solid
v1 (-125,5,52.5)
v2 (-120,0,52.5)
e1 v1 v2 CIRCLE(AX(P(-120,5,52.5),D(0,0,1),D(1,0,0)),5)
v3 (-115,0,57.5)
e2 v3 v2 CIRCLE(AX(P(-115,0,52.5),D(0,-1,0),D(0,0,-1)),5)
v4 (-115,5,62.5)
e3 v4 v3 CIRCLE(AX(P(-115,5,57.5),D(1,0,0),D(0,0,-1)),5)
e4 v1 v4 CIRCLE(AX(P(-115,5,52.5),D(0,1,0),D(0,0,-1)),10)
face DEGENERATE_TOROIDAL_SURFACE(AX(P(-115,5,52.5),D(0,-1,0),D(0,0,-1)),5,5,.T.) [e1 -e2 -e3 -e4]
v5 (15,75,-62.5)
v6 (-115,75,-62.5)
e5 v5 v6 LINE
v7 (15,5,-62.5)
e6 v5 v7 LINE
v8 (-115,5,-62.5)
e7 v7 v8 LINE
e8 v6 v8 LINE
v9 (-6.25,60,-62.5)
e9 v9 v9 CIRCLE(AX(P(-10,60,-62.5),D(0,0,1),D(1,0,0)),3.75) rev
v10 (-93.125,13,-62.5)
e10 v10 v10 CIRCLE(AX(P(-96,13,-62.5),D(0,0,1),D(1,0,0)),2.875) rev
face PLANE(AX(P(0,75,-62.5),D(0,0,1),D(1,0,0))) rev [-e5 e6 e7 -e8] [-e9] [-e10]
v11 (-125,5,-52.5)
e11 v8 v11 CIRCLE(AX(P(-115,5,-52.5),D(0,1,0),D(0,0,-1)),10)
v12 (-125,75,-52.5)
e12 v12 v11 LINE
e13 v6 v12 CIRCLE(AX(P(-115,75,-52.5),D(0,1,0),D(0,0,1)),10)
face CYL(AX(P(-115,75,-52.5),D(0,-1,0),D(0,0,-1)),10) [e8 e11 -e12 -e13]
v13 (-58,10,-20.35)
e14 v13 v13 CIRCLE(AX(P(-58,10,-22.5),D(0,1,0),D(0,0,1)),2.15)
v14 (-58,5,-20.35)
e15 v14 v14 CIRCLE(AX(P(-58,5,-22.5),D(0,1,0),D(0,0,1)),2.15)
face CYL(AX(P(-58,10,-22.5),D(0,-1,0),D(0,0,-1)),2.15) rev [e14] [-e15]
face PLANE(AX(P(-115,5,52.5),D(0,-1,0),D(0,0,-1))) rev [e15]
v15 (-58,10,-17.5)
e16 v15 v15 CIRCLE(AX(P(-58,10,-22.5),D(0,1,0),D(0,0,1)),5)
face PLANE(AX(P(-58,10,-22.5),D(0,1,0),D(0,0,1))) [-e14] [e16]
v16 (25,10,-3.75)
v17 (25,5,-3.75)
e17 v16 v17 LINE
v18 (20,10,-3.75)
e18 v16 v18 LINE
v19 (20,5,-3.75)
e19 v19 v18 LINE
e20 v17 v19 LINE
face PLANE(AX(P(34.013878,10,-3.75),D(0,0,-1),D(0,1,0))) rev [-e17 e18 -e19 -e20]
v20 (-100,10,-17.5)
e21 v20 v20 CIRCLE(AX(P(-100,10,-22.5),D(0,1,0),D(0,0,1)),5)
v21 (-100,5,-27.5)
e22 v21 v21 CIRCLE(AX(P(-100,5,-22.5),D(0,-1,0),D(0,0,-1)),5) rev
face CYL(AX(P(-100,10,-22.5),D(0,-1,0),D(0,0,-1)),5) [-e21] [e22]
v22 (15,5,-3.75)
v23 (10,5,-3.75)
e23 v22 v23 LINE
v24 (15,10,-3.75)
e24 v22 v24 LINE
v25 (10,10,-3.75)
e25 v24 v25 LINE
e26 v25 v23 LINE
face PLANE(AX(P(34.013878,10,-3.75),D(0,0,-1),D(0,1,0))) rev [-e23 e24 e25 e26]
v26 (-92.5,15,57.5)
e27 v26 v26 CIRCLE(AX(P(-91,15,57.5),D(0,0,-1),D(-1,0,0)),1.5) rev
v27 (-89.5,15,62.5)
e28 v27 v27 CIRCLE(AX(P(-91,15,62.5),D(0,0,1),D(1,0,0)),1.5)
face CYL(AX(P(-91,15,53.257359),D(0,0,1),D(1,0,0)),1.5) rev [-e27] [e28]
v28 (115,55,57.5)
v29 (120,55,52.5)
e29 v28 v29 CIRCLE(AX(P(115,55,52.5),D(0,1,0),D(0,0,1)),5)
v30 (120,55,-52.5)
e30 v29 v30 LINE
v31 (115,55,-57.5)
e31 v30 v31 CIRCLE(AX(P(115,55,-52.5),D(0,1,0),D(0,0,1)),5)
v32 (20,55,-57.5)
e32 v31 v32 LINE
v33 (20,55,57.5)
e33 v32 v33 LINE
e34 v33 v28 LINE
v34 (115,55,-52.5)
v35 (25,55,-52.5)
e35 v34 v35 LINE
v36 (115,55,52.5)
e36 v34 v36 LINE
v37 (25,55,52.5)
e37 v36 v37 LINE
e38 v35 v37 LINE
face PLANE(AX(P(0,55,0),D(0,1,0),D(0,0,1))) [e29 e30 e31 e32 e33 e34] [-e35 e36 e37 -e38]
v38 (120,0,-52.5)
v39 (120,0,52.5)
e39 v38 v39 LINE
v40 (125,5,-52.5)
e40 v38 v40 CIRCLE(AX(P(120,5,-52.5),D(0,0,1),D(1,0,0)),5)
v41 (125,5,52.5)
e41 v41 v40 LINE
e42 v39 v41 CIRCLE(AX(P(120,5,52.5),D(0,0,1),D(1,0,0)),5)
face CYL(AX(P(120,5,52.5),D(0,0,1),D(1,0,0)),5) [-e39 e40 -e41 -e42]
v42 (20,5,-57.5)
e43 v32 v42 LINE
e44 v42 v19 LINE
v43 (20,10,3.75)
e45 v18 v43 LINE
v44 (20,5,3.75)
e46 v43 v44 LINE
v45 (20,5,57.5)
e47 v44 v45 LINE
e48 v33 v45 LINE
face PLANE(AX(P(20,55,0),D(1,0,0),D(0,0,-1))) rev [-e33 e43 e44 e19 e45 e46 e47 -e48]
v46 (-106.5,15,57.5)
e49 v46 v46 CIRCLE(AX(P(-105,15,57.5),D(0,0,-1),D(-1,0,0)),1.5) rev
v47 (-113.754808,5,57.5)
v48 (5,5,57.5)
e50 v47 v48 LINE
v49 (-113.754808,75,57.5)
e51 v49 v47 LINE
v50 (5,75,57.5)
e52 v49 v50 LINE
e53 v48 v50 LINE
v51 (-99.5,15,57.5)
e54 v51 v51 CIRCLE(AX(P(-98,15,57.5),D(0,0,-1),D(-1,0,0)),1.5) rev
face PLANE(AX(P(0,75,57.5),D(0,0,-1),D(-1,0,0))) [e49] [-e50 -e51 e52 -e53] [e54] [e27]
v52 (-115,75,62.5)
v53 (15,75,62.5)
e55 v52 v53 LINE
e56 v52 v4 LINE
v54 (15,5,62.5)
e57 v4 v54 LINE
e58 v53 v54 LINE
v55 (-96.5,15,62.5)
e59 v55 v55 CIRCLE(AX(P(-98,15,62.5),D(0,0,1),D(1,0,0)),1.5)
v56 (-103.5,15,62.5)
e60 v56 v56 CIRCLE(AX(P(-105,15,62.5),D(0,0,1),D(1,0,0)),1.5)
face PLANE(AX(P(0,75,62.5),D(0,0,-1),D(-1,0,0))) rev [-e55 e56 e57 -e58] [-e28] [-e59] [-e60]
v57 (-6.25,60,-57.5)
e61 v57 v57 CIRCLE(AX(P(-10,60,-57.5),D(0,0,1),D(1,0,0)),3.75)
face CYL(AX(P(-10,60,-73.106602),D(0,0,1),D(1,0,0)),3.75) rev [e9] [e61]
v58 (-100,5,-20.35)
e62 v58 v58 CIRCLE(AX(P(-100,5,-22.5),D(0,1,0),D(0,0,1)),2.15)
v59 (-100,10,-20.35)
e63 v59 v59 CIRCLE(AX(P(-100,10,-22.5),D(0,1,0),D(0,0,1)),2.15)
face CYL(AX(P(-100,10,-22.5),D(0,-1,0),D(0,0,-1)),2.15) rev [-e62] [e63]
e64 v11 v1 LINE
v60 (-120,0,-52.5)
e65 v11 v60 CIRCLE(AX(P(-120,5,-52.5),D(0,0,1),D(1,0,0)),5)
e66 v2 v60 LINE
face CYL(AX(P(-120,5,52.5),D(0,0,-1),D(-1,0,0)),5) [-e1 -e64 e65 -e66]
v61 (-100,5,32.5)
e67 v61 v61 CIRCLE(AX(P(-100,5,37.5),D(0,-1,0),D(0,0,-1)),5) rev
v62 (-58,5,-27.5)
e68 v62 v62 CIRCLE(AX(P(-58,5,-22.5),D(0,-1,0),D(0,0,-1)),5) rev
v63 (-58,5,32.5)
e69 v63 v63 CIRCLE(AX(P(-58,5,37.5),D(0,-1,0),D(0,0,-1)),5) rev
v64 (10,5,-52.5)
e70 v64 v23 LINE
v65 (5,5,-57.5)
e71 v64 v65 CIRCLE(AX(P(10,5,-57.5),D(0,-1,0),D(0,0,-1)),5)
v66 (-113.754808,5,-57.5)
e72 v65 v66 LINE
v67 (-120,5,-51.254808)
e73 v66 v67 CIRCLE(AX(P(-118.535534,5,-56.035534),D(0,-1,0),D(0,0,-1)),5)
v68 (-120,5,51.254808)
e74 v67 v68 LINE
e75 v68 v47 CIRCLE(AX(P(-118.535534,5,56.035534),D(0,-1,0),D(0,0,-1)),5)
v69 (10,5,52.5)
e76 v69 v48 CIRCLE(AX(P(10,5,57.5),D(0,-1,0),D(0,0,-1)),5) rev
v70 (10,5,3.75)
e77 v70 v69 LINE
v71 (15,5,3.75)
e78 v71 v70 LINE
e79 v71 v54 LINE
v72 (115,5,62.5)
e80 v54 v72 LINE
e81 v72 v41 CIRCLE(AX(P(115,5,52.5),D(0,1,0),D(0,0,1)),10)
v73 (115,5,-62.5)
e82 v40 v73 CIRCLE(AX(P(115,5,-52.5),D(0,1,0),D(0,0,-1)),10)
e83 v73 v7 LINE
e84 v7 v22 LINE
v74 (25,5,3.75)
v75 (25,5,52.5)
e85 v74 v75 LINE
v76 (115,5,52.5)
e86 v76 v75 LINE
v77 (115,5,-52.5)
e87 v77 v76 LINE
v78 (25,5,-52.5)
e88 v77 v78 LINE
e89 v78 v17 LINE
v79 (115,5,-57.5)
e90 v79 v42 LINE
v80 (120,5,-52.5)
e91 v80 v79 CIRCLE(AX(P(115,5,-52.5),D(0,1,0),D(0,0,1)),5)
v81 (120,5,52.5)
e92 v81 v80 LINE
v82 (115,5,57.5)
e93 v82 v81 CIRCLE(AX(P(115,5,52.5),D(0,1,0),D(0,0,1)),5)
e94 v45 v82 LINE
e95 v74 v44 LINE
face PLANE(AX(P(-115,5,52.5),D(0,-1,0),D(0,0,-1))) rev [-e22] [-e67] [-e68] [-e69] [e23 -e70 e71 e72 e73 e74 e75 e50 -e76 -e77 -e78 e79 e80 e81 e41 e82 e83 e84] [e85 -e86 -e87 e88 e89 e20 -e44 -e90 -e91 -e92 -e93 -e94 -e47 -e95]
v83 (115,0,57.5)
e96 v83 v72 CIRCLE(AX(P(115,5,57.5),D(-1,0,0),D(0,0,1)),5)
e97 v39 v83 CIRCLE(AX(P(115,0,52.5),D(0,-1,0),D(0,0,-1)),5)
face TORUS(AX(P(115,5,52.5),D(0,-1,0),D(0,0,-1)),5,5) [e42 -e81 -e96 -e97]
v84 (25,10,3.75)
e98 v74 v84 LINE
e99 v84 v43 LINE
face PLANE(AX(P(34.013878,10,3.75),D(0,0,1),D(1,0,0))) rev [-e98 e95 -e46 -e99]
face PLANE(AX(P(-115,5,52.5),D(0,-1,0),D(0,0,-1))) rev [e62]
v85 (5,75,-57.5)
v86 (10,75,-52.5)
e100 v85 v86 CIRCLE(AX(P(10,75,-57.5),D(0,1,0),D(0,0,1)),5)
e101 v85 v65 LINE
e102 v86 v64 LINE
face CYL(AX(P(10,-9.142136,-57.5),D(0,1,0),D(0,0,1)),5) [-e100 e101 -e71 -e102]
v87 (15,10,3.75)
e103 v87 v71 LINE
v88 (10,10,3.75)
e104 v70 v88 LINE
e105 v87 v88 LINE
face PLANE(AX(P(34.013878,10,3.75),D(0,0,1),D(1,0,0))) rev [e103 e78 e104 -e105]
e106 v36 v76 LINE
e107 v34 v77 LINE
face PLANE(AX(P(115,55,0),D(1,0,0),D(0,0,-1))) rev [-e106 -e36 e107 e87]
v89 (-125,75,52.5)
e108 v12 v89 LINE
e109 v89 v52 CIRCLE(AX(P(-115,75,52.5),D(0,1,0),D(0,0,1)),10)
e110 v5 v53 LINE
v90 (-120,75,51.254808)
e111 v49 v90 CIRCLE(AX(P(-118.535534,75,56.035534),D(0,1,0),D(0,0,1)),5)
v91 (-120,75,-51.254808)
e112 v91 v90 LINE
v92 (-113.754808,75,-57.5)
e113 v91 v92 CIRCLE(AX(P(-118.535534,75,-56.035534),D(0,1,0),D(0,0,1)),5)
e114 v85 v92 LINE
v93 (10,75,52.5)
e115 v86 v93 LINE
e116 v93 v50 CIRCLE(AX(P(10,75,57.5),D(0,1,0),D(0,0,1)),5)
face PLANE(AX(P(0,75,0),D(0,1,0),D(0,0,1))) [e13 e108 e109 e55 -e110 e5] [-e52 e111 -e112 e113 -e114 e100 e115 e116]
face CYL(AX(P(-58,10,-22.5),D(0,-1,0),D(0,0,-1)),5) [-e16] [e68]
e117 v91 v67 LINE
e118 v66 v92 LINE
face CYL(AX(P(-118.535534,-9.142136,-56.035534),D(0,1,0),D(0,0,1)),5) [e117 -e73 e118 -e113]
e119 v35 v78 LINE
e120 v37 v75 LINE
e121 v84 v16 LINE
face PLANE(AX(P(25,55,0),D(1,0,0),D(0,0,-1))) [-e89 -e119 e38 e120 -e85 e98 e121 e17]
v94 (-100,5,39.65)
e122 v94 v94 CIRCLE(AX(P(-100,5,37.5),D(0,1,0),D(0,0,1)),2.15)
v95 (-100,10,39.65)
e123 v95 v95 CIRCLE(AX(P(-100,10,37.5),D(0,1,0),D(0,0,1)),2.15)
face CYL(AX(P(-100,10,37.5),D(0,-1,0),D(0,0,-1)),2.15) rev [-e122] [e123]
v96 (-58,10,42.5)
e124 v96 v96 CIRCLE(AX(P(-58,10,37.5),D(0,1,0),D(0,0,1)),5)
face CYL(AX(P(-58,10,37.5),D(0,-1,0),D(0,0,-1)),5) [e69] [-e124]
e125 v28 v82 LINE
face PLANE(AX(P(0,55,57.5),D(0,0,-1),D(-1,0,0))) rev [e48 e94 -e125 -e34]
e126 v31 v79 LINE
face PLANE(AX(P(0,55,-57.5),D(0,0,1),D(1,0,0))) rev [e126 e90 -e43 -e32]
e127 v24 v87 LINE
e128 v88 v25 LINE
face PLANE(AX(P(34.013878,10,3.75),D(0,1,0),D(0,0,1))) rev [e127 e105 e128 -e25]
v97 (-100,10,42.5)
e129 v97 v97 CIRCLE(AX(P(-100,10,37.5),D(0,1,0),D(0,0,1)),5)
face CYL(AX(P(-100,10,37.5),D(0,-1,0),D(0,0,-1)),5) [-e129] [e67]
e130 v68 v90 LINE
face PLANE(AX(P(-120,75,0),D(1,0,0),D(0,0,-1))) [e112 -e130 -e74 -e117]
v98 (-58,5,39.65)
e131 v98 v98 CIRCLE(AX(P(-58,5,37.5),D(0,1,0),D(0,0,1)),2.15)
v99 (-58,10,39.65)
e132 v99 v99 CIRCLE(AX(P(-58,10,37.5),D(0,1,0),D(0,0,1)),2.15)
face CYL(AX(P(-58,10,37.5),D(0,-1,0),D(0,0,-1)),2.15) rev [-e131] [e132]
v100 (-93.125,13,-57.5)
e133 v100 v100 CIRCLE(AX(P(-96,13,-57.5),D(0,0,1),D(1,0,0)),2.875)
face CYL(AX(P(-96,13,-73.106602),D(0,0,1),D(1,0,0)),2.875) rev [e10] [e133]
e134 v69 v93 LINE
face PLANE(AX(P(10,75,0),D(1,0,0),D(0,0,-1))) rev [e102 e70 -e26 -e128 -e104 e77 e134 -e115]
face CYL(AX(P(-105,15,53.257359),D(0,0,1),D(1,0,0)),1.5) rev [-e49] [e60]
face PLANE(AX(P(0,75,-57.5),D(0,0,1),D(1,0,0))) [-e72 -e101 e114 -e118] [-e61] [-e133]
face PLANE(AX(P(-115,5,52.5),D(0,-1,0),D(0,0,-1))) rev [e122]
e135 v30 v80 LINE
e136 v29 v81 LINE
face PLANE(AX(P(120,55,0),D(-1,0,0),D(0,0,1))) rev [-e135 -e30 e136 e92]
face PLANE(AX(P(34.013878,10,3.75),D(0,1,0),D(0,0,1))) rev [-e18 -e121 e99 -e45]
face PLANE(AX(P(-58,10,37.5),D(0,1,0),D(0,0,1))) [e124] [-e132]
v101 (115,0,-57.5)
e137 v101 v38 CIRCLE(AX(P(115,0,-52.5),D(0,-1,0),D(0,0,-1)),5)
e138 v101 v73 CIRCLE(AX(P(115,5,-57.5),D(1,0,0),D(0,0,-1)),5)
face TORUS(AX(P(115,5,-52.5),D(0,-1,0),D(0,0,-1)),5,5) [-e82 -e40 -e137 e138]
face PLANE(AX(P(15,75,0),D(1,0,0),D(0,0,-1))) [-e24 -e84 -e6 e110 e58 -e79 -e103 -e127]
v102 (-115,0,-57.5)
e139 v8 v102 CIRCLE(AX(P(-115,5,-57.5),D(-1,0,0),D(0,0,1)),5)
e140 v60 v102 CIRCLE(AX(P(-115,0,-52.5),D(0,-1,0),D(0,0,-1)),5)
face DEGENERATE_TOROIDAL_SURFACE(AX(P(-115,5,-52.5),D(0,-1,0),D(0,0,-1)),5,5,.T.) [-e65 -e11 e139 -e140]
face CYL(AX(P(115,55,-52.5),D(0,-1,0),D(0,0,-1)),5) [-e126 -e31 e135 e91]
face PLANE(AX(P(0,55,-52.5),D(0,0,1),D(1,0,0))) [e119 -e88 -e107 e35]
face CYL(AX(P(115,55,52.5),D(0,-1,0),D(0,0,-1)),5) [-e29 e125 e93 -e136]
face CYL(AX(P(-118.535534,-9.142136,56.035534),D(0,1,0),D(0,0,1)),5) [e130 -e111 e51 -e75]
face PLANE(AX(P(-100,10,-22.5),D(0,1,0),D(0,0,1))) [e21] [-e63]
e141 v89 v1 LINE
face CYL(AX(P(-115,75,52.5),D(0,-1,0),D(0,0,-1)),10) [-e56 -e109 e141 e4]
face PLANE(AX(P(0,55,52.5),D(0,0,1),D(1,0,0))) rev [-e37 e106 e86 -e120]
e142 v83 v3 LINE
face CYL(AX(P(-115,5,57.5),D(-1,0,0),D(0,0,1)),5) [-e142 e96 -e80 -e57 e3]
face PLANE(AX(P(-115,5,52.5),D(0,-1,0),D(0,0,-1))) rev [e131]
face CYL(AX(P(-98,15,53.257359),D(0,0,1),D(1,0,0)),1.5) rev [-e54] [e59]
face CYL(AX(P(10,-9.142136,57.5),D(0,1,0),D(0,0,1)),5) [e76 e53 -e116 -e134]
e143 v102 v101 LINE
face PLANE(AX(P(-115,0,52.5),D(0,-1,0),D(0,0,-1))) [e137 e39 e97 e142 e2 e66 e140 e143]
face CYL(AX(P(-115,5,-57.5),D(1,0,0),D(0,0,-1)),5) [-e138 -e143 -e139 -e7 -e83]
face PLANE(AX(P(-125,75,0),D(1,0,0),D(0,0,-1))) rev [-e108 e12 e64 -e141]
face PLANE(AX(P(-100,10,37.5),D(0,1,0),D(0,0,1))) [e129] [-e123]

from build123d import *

# Parameters (mm, degrees)
BOSS_EXTRUDE1_DEPTH = 5
FILLET1_R           = 5
SKETCH2_W           = 5
SKETCH2_H           = 115
SKETCH2_H_2         = 5
BOSS_EXTRUDE2_DEPTH = 70
SKETCH2_3_W         = 5
SKETCH2_3_H         = 105
SKETCH2_3_H_2       = 5
BOSS_EXTRUDE3_DEPTH = 50
SKETCH3_R           = 5
BOSS_EXTRUDE4_DEPTH = 70
CUT_EXTRUDE1_REACH  = 168.602
SKETCH4_W           = 7.5
SKETCH4_H           = 5
SKETCH5_R           = 2.875
SKETCH5_R_2         = 3.75
CUT_EXTRUDE2_DEPTH  = 5
SKETCH6_R           = 1.5
CUT_EXTRUDE3_DEPTH  = 5
SKETCH8_R           = 5
SKETCH8_R_2         = 2.15
BOSS_EXTRUDE5_DEPTH = 5


with BuildPart() as part:
    # Sketch1 → Boss-Extrude1 (new body)
    with BuildSketch(Plane(origin=(0, 0, 0), x_dir=(1, 0, 0), z_dir=(0, 1, 0))):
        with BuildLine():
            Line((-115, -62.5), (115, -62.5))
            ThreePointArc((115, -62.5), (122.071067812, -59.571067812), (125, -52.5))
            Line((125, -52.5), (125, 52.5))
            ThreePointArc((125, 52.5), (122.071067812, 59.571067812), (115, 62.5))
            Line((115, 62.5), (-115, 62.5))
            ThreePointArc((-115, 62.5), (-122.071067812, 59.571067812), (-125, 52.5))
            Line((-125, 52.5), (-125, -52.5))
            ThreePointArc((-125, -52.5), (-122.071067812, -59.571067812), (-115, -62.5))
        make_face()
    extrude(amount=BOSS_EXTRUDE1_DEPTH)

    # Fillet1
    fillet1_edges = [part.edges().sort_by_distance(p)[0] for p in [
        (0, 0, 62.5),
        (122.071067812, 0, 59.571067812),
        (125, 0, 0),
        (122.071067812, 0, -59.571067812),
        (0, 0, -62.5),
        (-122.071067812, 0, -59.571067812),
        (-125, 0, 0),
        (-122.071067812, 0, 59.571067812),
    ]]
    fillet(fillet1_edges, radius=FILLET1_R - 0.0001)  # a hair under: the kernel refuses the full size

    # Sketch2 → Boss-Extrude2 (add)
    with BuildSketch(Plane(origin=(0, 5, 0), x_dir=(1, 0, 0), z_dir=(0, 1, 0))):
        with Locations((12.5, 0)):
            Rectangle(SKETCH2_W, SKETCH2_H)
        with Locations((12.5, -60)):
            Rectangle(SKETCH2_W, SKETCH2_H_2)
        with BuildLine():
            Line((10, -62.5), (10, -57.5))
            Line((10, -57.5), (-115, -57.5))
            ThreePointArc((-115, -57.5), (-118.535533906, -56.035533906), (-120, -52.5))
            Line((-120, -52.5), (-120, 52.5))
            ThreePointArc((-120, 52.5), (-118.535533906, 56.035533906), (-115, 57.5))
            Line((-115, 57.5), (10, 57.5))
            Line((10, 57.5), (10, 62.5))
            Line((10, 62.5), (-115, 62.5))
            ThreePointArc((-115, 62.5), (-122.071067812, 59.571067812), (-125, 52.5))
            Line((-125, 52.5), (-125, -52.5))
            ThreePointArc((-125, -52.5), (-122.071067812, -59.571067812), (-115, -62.5))
            Line((-115, -62.5), (10, -62.5))
        make_face()
        with Locations((12.5, 60)):
            Rectangle(SKETCH2_W, SKETCH2_H_2)
    extrude(amount=BOSS_EXTRUDE2_DEPTH)

    # Sketch2<3> → Boss-Extrude3 (add)
    with BuildSketch(Plane(origin=(0, 5, 0), x_dir=(1, 0, 0), z_dir=(0, 1, 0))):
        with Locations((22.5, 0)):
            Rectangle(SKETCH2_3_W, SKETCH2_3_H)
        with BuildLine():
            Line((25, -52.5), (25, -57.5))
            Line((25, -57.5), (115, -57.5))
            ThreePointArc((115, -57.5), (118.535533906, -56.035533906), (120, -52.5))
            Line((120, -52.5), (120, 52.5))
            ThreePointArc((120, 52.5), (118.535533906, 56.035533906), (115, 57.5))
            Line((115, 57.5), (25, 57.5))
            Line((25, 57.5), (25, 52.5))
            Line((25, 52.5), (115, 52.5))
            Line((115, 52.5), (115, -52.5))
            Line((115, -52.5), (25, -52.5))
        make_face()
        with Locations((22.5, 55)):
            Rectangle(SKETCH2_3_W, SKETCH2_3_H_2)
        with Locations((22.5, -55)):
            Rectangle(SKETCH2_3_W, SKETCH2_3_H_2)
    extrude(amount=BOSS_EXTRUDE3_DEPTH)

    # Sketch3 → Boss-Extrude4 (add)
    with BuildSketch(Plane(origin=(0, 75, 0), x_dir=(1, 0, 0), z_dir=(0, 1, 0))):
        with Locations((-118.535533906, 56.035533906)):
            Circle(SKETCH3_R)
        with Locations((10, 57.5)):
            Circle(SKETCH3_R)
        with Locations((10, -57.5)):
            Circle(SKETCH3_R)
        with Locations((-118.535533906, -56.035533906)):
            Circle(SKETCH3_R)
    extrude(amount=-BOSS_EXTRUDE4_DEPTH)

    # Cut-Extrude1: up to this face of the body (flat: up to its plane)
    cut_extrude1_end = Plane(part.part.faces().sort_by_distance((25, 30, 0))[0])
    # Sketch4 → Cut-Extrude1 (cut, up to the picked face)
    with BuildSketch(Plane.ZY.offset(-10), mode=Mode.PRIVATE) as cut_extrude1_sk1:
        with Locations((0, 7.5)):
            Rectangle(SKETCH4_W, SKETCH4_H)
    cut_extrude1_tool1 = split(extrude(cut_extrude1_sk1.sketch, amount=-CUT_EXTRUDE1_REACH, mode=Mode.PRIVATE), bisect_by=cut_extrude1_end, keep=Keep.BOTH, mode=Mode.PRIVATE)
    add(cut_extrude1_tool1.solids().sort_by(Axis((10, 7.5, 0), (1, 0, 0)))[0], mode=Mode.SUBTRACT)

    # Sketch5 → Cut-Extrude2 (cut)
    with BuildSketch(Plane.XY.offset(-57.5)):
        with Locations((-96, 13)):
            Circle(SKETCH5_R)
        with Locations((-10, 60)):
            Circle(SKETCH5_R_2)
    extrude(amount=-CUT_EXTRUDE2_DEPTH, mode=Mode.SUBTRACT)

    # Sketch6 → Cut-Extrude3 (cut)
    with BuildSketch(Plane.XY.offset(62.5)):
        with Locations((-105, 15)):
            Circle(SKETCH6_R)
        with Locations((-98, 15)):
            Circle(SKETCH6_R)
        with Locations((-91, 15)):
            Circle(SKETCH6_R)
    extrude(amount=-CUT_EXTRUDE3_DEPTH, mode=Mode.SUBTRACT)

    # Sketch8 → Boss-Extrude5 (add)
    # profile 1 of 4: a face of its own
    with BuildSketch(Plane(origin=(0, 5, 0), x_dir=(1, 0, 0), z_dir=(0, 1, 0))):
        with Locations(Location((-100, -37.5, 0), (0, 0, 90))):
            Circle(SKETCH8_R)
        with Locations(Location((-100, -37.5, 0), (0, 0, 270))):
            Circle(SKETCH8_R_2, mode=Mode.SUBTRACT)
    # profile 2 of 4: a face of its own
    with BuildSketch(Plane(origin=(0, 5, 0), x_dir=(1, 0, 0), z_dir=(0, 1, 0))):
        with Locations(Location((-58, -37.5, 0), (0, 0, 90))):
            Circle(SKETCH8_R)
        with Locations(Location((-58, -37.5, 0), (0, 0, 270))):
            Circle(SKETCH8_R_2, mode=Mode.SUBTRACT)
    # profile 3 of 4: a face of its own
    with BuildSketch(Plane(origin=(0, 5, 0), x_dir=(1, 0, 0), z_dir=(0, 1, 0))):
        with Locations(Location((-58, 22.5, 0), (0, 0, 90))):
            Circle(SKETCH8_R)
        with Locations(Location((-58, 22.5, 0), (0, 0, 270))):
            Circle(SKETCH8_R_2, mode=Mode.SUBTRACT)
    # profile 4 of 4: a face of its own
    with BuildSketch(Plane(origin=(0, 5, 0), x_dir=(1, 0, 0), z_dir=(0, 1, 0))):
        with Locations(Location((-100, 22.5, 0), (0, 0, 90))):
            Circle(SKETCH8_R)
        with Locations(Location((-100, 22.5, 0), (0, 0, 270))):
            Circle(SKETCH8_R_2, mode=Mode.SUBTRACT)
    extrude(amount=BOSS_EXTRUDE5_DEPTH)


solid = part.part
